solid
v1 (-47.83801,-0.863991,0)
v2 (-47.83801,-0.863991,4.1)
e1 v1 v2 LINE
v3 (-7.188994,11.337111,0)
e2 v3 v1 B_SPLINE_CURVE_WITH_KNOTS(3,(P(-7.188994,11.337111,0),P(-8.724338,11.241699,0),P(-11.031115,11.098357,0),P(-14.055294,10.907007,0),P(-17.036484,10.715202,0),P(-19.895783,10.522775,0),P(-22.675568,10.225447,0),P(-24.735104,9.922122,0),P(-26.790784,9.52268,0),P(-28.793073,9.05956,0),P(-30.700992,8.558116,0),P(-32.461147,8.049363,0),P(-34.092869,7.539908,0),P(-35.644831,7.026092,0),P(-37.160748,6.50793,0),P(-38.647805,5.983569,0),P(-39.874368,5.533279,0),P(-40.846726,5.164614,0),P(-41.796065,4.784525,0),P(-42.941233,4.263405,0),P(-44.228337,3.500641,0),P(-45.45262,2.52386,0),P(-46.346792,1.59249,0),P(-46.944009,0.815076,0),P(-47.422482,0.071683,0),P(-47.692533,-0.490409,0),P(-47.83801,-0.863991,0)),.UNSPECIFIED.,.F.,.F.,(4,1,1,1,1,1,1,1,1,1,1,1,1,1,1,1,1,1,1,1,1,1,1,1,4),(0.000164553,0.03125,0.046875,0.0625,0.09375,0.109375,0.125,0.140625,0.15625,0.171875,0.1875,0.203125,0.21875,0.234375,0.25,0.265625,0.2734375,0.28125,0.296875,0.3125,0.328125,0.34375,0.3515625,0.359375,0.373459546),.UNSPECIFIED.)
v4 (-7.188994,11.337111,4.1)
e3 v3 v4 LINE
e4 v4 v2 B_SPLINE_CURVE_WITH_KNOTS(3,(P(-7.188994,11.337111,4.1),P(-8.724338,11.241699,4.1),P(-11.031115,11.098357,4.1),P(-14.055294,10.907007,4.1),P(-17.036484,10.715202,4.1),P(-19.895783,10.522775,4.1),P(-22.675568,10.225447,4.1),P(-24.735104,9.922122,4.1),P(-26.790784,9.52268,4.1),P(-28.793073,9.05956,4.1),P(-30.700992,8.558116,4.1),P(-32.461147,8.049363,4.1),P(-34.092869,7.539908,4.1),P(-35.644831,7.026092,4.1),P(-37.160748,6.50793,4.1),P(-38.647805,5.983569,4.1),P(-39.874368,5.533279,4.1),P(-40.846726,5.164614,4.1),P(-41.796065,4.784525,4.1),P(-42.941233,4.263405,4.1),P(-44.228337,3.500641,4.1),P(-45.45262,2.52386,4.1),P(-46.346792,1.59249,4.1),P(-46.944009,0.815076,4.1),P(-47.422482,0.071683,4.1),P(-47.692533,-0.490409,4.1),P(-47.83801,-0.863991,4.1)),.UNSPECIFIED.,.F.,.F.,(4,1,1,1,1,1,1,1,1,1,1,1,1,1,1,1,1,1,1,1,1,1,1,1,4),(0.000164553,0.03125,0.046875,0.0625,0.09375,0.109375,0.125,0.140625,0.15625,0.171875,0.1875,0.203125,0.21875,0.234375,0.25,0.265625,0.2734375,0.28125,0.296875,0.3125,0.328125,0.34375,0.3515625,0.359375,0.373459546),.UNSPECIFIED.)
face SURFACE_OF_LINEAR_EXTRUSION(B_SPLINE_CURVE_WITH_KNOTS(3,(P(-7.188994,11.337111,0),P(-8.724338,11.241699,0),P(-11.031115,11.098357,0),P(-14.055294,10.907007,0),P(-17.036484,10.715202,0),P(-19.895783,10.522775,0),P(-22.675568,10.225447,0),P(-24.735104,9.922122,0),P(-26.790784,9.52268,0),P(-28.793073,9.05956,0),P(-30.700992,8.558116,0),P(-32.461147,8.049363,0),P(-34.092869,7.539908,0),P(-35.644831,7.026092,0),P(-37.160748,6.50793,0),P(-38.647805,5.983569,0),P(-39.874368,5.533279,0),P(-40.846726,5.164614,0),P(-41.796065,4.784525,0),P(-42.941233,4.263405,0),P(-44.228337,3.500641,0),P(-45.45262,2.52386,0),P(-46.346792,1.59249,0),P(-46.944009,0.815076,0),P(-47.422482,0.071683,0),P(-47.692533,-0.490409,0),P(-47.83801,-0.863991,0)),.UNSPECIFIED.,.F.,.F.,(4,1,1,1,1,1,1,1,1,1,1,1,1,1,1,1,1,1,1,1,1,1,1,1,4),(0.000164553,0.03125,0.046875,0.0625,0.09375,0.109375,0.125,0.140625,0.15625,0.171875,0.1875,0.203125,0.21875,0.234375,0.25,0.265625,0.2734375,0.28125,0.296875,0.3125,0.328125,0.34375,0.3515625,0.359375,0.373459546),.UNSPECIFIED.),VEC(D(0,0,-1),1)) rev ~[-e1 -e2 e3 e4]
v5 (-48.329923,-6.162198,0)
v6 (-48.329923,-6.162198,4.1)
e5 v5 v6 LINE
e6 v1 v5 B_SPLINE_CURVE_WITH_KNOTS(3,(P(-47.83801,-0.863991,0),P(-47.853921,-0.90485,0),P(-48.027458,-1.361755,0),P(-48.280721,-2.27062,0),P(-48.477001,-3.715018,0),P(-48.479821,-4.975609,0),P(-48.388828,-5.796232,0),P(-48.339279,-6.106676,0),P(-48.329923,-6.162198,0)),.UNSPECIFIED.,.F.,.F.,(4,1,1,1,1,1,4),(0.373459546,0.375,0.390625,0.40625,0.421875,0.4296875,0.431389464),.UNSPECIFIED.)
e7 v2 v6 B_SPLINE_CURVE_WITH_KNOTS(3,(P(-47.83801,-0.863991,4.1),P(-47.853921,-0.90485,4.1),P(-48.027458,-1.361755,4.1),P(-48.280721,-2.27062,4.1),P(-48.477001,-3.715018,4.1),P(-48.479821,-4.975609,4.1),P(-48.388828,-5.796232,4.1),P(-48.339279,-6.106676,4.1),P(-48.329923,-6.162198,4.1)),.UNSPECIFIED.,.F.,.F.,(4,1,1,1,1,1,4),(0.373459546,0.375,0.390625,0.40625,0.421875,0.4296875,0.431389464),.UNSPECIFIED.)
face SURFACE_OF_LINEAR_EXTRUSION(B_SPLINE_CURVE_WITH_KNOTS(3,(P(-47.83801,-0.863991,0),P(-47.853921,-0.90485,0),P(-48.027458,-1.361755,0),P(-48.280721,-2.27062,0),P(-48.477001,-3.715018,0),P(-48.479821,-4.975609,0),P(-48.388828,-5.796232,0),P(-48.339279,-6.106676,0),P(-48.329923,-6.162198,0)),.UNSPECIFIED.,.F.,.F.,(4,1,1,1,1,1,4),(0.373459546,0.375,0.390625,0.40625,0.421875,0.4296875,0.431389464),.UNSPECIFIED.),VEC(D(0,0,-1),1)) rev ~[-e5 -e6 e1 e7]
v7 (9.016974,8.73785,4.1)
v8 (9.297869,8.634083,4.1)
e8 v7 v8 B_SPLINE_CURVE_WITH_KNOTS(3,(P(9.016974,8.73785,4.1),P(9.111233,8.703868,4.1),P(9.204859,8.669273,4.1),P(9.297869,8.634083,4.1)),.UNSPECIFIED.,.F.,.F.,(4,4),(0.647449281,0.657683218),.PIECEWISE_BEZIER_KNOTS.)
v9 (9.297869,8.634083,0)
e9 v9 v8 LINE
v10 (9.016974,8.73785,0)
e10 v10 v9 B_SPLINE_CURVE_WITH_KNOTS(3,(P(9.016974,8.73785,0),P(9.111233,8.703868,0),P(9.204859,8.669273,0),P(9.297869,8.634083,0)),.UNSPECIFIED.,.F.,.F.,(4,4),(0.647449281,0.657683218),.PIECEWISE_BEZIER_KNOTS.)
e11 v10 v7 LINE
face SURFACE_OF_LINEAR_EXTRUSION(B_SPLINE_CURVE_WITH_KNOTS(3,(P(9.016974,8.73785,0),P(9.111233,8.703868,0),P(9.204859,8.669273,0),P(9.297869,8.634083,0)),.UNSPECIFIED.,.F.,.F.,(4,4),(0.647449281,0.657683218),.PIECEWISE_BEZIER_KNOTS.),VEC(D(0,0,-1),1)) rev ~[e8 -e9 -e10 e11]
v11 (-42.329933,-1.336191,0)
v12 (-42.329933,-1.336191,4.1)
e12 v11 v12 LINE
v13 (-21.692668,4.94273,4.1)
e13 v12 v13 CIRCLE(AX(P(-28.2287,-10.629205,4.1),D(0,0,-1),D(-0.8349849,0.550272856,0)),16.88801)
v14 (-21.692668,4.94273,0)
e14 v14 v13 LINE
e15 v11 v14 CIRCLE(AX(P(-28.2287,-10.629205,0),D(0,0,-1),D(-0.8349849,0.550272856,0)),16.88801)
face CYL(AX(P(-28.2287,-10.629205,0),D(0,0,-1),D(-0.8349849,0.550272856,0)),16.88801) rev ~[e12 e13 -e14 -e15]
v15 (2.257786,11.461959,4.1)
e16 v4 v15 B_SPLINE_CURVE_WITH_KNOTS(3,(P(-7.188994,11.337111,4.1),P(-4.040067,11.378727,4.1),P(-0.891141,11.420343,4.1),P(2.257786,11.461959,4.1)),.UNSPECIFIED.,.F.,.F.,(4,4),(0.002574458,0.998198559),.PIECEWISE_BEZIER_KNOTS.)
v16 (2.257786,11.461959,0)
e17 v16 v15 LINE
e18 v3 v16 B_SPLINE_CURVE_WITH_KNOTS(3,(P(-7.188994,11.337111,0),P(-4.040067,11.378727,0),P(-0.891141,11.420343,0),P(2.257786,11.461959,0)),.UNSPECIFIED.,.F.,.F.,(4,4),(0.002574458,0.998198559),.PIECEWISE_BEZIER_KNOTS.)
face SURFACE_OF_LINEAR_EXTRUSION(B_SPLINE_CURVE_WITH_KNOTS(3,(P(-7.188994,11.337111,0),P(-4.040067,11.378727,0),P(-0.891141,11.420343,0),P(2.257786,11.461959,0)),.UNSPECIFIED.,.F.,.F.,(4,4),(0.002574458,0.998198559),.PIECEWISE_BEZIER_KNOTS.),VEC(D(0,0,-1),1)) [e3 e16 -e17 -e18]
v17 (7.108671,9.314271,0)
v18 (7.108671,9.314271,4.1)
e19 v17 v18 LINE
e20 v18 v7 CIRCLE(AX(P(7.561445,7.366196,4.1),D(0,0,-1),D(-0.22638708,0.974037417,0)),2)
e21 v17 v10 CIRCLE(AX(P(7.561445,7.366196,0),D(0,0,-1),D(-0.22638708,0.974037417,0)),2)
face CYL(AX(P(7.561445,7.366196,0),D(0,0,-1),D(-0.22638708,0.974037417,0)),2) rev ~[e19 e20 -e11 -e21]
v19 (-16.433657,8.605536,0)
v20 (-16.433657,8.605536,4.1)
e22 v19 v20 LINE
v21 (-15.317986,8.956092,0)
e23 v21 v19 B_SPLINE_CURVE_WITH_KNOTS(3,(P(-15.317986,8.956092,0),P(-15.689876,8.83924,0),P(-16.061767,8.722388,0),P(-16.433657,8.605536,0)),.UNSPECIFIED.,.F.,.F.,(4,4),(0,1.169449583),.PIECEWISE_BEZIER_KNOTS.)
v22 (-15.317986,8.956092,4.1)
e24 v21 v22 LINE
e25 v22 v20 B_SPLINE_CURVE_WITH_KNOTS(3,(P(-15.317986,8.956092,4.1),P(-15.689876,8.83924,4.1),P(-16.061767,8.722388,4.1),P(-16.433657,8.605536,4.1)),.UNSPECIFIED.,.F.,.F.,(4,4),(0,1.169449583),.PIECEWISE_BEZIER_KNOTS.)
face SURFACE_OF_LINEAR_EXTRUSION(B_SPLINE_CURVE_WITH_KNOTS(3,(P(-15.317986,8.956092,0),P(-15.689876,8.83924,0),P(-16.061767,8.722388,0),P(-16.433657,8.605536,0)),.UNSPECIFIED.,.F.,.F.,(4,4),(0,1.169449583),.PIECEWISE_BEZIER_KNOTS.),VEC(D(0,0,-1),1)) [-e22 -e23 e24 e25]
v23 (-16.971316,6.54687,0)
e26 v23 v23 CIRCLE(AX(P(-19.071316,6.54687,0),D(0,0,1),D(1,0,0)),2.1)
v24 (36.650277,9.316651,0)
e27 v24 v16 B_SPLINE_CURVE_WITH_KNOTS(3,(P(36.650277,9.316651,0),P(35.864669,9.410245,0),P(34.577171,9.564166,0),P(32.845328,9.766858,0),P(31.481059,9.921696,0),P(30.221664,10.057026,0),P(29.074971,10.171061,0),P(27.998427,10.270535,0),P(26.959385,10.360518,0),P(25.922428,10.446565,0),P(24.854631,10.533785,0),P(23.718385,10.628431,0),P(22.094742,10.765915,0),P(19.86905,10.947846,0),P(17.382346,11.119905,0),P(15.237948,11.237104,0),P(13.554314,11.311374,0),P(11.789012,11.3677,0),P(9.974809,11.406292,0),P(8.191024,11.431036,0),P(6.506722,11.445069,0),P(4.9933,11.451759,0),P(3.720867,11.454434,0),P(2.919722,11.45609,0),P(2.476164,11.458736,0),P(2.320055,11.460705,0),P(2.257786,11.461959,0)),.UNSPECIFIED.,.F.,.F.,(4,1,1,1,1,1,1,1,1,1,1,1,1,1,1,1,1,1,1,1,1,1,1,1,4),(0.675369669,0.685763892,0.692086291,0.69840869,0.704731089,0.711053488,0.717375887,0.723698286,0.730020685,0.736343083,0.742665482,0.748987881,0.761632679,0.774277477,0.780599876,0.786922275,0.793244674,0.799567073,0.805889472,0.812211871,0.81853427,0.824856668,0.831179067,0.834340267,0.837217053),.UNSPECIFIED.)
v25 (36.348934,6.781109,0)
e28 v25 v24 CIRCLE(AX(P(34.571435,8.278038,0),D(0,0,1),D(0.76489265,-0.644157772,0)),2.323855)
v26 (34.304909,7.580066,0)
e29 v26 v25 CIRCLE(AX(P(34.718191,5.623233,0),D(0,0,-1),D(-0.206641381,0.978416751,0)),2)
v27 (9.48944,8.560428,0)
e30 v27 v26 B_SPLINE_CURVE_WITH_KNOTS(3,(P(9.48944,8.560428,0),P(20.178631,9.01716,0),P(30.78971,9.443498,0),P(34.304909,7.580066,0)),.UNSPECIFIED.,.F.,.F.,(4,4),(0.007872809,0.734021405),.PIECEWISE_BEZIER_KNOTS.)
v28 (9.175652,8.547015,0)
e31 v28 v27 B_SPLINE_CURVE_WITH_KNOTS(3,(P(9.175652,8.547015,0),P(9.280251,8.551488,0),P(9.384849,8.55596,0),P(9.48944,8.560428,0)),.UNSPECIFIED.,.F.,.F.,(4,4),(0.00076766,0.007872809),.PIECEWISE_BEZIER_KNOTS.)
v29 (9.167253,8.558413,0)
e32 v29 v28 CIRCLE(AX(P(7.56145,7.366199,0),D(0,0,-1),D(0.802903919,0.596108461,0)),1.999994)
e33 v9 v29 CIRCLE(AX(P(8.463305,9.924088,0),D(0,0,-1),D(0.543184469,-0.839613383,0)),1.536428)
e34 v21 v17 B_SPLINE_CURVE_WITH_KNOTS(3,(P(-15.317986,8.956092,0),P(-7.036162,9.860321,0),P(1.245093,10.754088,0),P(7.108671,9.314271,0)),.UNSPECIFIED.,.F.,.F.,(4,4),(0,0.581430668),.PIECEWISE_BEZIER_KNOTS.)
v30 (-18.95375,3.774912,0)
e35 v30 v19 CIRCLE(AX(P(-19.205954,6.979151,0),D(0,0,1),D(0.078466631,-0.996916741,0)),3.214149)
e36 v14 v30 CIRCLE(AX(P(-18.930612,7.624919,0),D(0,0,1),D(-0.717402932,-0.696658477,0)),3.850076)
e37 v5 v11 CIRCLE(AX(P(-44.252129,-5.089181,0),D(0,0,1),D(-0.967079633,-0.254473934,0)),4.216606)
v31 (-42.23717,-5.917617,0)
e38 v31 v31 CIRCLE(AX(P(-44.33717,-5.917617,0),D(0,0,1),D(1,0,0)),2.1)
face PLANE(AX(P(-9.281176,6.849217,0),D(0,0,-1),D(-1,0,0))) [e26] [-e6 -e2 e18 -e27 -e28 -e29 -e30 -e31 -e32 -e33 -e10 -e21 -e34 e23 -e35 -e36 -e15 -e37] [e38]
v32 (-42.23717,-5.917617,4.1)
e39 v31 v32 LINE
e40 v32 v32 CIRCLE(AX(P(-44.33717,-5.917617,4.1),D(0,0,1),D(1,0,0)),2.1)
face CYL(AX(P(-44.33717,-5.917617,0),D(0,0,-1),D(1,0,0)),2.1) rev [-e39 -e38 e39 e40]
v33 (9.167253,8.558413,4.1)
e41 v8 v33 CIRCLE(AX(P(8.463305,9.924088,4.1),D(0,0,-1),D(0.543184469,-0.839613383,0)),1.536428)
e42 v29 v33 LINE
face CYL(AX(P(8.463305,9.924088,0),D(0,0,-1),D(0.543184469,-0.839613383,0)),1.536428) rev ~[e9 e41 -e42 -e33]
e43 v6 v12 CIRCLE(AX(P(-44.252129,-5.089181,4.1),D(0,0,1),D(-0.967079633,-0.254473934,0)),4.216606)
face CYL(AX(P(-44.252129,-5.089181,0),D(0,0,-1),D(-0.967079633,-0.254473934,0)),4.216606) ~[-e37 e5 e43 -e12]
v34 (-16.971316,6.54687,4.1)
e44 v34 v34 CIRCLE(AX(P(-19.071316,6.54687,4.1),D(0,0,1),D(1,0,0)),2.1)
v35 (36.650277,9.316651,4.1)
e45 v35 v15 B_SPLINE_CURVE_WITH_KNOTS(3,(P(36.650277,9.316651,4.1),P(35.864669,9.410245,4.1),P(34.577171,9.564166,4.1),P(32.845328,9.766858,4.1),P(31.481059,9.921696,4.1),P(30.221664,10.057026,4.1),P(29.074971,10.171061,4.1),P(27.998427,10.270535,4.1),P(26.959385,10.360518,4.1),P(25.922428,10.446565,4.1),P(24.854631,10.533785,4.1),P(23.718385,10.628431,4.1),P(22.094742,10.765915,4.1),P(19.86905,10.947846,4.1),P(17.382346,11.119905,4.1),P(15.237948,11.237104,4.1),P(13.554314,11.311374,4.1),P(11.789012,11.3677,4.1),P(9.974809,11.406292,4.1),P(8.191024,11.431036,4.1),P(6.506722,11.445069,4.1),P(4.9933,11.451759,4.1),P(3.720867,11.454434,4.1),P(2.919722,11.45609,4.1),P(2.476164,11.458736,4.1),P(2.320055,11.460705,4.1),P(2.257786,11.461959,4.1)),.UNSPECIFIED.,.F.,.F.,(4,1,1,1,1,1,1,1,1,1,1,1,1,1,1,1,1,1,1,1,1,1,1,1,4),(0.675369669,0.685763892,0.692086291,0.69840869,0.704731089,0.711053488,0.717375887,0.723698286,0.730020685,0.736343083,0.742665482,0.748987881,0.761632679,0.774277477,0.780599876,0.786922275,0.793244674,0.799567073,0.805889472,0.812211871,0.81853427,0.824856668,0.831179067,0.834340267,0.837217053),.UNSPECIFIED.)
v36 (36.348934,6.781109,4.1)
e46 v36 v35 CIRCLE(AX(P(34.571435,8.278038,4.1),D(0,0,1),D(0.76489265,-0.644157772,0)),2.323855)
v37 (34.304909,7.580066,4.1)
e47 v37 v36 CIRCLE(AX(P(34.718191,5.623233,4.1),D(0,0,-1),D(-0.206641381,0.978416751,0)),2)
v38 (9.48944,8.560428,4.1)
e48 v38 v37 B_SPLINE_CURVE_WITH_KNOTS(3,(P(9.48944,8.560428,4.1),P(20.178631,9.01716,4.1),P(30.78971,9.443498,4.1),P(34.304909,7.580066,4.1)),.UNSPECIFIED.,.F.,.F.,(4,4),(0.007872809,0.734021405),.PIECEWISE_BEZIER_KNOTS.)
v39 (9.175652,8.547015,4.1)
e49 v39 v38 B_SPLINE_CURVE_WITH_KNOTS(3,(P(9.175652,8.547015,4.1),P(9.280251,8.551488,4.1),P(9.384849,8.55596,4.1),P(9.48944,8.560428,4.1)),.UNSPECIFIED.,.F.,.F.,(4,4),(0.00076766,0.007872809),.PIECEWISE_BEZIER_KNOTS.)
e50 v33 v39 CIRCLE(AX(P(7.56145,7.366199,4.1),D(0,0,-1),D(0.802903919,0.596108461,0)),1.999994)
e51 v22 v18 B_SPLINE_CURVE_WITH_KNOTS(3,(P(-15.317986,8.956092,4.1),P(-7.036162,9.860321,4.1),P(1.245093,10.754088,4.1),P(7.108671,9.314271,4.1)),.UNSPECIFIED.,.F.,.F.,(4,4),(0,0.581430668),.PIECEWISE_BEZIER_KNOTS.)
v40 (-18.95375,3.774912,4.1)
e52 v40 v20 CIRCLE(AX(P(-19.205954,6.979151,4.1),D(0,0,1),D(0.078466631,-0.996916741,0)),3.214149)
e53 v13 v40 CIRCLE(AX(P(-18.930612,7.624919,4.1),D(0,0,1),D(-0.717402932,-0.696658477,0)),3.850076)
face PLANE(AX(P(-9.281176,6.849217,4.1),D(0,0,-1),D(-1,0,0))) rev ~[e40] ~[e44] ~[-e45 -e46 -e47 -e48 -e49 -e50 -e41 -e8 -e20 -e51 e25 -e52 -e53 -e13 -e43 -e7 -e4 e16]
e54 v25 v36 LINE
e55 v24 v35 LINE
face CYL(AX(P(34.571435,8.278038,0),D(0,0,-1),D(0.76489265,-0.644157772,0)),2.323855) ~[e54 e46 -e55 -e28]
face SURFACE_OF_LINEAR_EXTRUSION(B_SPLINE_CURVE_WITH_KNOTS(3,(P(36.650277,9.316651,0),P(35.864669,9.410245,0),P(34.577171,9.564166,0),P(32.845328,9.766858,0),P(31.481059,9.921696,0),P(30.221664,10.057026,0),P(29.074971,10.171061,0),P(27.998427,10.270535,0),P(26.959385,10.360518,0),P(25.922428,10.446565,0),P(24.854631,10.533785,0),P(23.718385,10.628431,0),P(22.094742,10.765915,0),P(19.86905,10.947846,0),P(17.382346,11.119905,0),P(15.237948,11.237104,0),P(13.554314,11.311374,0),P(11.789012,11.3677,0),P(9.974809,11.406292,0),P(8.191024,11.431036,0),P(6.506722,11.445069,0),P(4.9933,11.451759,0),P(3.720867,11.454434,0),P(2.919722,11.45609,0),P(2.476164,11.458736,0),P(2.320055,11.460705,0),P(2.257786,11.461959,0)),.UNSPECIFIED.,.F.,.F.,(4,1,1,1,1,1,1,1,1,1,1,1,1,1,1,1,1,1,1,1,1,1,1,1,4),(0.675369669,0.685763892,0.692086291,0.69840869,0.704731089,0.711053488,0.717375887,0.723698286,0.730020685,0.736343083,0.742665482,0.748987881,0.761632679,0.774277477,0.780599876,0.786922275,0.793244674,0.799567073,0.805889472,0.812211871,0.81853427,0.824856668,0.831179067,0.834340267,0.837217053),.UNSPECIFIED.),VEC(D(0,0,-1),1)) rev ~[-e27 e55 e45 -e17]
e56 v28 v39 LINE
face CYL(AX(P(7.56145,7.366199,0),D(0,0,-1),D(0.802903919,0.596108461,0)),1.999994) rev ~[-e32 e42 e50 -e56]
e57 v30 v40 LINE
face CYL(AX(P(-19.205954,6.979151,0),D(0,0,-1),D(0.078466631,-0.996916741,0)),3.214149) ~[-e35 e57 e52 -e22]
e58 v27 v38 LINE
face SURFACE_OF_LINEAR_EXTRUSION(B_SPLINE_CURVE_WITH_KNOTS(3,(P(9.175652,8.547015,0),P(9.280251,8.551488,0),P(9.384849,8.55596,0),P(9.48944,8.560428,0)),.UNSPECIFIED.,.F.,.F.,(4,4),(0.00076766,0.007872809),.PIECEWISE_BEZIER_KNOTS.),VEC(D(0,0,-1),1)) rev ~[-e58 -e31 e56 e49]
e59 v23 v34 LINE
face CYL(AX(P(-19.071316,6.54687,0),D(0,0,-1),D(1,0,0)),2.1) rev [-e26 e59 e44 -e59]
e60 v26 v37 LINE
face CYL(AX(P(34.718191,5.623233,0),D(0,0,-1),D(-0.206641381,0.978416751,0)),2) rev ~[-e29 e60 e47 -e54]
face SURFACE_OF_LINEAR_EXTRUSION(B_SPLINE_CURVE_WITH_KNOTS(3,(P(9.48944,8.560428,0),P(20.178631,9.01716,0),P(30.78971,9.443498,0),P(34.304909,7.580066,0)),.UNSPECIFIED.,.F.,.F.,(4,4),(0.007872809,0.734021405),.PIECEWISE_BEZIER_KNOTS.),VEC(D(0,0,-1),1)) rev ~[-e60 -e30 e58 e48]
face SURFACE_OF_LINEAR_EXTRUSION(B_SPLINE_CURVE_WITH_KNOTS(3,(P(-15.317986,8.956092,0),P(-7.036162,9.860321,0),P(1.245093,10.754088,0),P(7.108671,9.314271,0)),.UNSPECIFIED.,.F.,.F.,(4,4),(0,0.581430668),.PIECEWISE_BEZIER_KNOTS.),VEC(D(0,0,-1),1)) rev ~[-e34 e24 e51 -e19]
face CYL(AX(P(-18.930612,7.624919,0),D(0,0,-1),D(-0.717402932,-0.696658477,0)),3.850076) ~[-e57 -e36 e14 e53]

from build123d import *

# Parameters (mm, degrees)
F0_R     = 2.1
F1_DEPTH = 4.1


# Not quite as in the source:
# - the dataset's text gives a spline's control points without its knots; the knots are read off the source's solid


with BuildPart() as f1:
    # F0 (on Top) → F1 (new body)
    with BuildSketch(Plane.XY):
        with BuildLine():
            add(Edge.make_bspline(
                [(-7.1889940943, 11.3371111296), (-4.0400674757, 11.378726928), (-0.8911408571, 11.4203427264), (2.2577857615, 11.4619585248)],
                knots=[0.0025744578, 0.0025744578, 0.0025744578, 0.0025744578, 0.9981985586, 0.9981985586, 0.9981985586, 0.9981985586], degree=3))
            add(Edge.make_bspline(
                [(-7.1889940943, 11.3371111296), (-8.7243380234, 11.2416990231), (-11.0311154467, 11.0983567929), (-14.0552941607, 10.9070068206), (-17.0364840295, 10.7152017294), (-19.8957827411, 10.5227751645), (-22.6755680541, 10.2254472092), (-24.7351040641, 9.9221224701), (-26.7907840734, 9.5226800469), (-28.7930725745, 9.0595604731), (-30.7009918926, 8.5581161043), (-32.4611472882, 8.0493632371), (-34.0928691245, 7.5399082887), (-35.6448312044, 7.0260920816), (-37.1607478855, 6.5079303839), (-38.6478053455, 5.9835690127), (-39.8743681253, 5.5332793467), (-40.8467259962, 5.1646139076), (-41.7960653414, 4.7845249787), (-42.9412331822, 4.2634047579), (-44.2283369213, 3.5006412719), (-45.4526195393, 2.5238601501), (-46.3467921373, 1.5924900737), (-46.9440085195, 0.8150763514), (-47.4224819266, 0.0716833781), (-47.6925333314, -0.4904090932), (-47.8380102388, -0.8639908212)],
                knots=[0.0001645527, 0.0001645527, 0.0001645527, 0.0001645527, 0.03125, 0.046875, 0.0625, 0.09375, 0.109375, 0.125, 0.140625, 0.15625, 0.171875, 0.1875, 0.203125, 0.21875, 0.234375, 0.25, 0.265625, 0.2734375, 0.28125, 0.296875, 0.3125, 0.328125, 0.34375, 0.3515625, 0.359375, 0.373459546, 0.373459546, 0.373459546, 0.373459546], degree=3))
            add(Edge.make_bspline(
                [(-47.8380102388, -0.8639908212), (-47.8539213294, -0.9048501769), (-48.0274581717, -1.3617547655), (-48.2807207722, -2.2706204398), (-48.4770009887, -3.7150176775), (-48.4798207479, -4.9756086404), (-48.3888275454, -5.7962324568), (-48.3392794649, -6.1066755823), (-48.3299230612, -6.1621975504)],
                knots=[0.373459546, 0.373459546, 0.373459546, 0.373459546, 0.375, 0.390625, 0.40625, 0.421875, 0.4296875, 0.4313894643, 0.4313894643, 0.4313894643, 0.4313894643], degree=3))
            ThreePointArc((-48.3299230612, -6.1621975504), (-41.6093586104, -8.374837019), (-42.3299329619, -1.3361913709))
            ThreePointArc((-42.3299329619, -1.3361913709), (-33.1444175869, 5.5275459689), (-21.6926677793, 4.9427303382))
            ThreePointArc((-21.6926677793, 4.9427303382), (-20.4406705014, 4.0833356397), (-18.9537504594, 3.7749118723))
            ThreePointArc((-18.9537504594, 3.7749118723), (-16.3562817519, 5.4925025893), (-16.4336573959, 8.6055356067))
            add(Edge.make_bspline(
                [(-15.3179860369, 8.9560919431), (-15.6898764899, 8.839239831), (-16.0617669429, 8.7223877188), (-16.4336573959, 8.6055356067)],
                knots=[0, 0, 0, 0, 1.1694495826, 1.1694495826, 1.1694495826, 1.1694495826], degree=3))
            add(Edge.make_bspline(
                [(-15.3179860369, 8.9560919431), (-7.0361622279, 9.8603205112), (1.2450933884, 10.7540884183), (7.1086706108, 9.3142706211)],
                knots=[0, 0, 0, 0, 0.5814306684, 0.5814306684, 0.5814306684, 0.5814306684], degree=3))
            ThreePointArc((7.1086706108, 9.3142706211), (8.1397564178, 9.2807598726), (9.0169736045, 8.7378501942))
            add(Edge.make_bspline(
                [(9.0169736045, 8.7378501942), (9.1112334208, 8.7038678093), (9.2048591167, 8.6692727004), (9.2978690964, 8.6340825262)],
                knots=[0.6474492811, 0.6474492811, 0.6474492811, 0.6474492811, 0.6576832175, 0.6576832175, 0.6576832175, 0.6576832175], degree=3))
            add(Edge.make_bspline(
                [(9.2978690964, 8.6340825262), (9.3620169205, 8.6098123015), (9.4258718675, 8.5852590228), (9.4894399752, 8.5604284832)],
                knots=[0.6576832175, 0.6576832175, 0.6576832175, 0.6576832175, 0.664741436, 0.664741436, 0.664741436, 0.664741436], degree=3))
            add(Edge.make_bspline(
                [(9.4894399752, 8.5604284832), (20.1786312058, 9.0171598272), (30.7897103436, 9.4434976677), (34.3049085784, 7.5800661268)],
                knots=[0.0078728095, 0.0078728095, 0.0078728095, 0.0078728095, 0.7340214047, 0.7340214047, 0.7340214047, 0.7340214047], degree=3))
            ThreePointArc((34.3049085784, 7.5800661268), (35.4462954706, 7.4859898214), (36.3489343996, 6.7811087302))
            ThreePointArc((36.3489343996, 6.7811087302), (36.8790497693, 8.0037841101), (36.6502768797, 9.3166513367))
            add(Edge.make_bspline(
                [(36.6502768797, 9.3166513367), (35.8646692204, 9.4102452527), (34.5771705441, 9.5641656546), (32.8453284038, 9.766858119), (31.4810593515, 9.9216959685), (30.2216638222, 10.0570259134), (29.0749710159, 10.1710606279), (27.998427122, 10.2705354697), (26.9593851329, 10.3605177789), (25.9224275902, 10.4465645091), (24.8546312229, 10.5337851633), (23.7183846338, 10.6284306145), (22.0947419096, 10.7659145801), (19.8690501247, 10.947846215), (17.3823459067, 11.1199052699), (15.2379483396, 11.23710443), (13.5543144395, 11.3113741003), (11.7890118212, 11.36769996), (9.9748087559, 11.4062922205), (8.1910240467, 11.4310364541), (6.5067223519, 11.4450690607), (4.9932998476, 11.4517588504), (3.72086677, 11.4544341193), (2.9197217826, 11.456089603), (2.4761636021, 11.4587356227), (2.3200545408, 11.4607049569), (2.2577857615, 11.4619585248)],
                knots=[0.6753696694, 0.6753696694, 0.6753696694, 0.6753696694, 0.6857638921, 0.692086291, 0.6984086899, 0.7047310889, 0.7110534878, 0.7173758867, 0.7236982857, 0.7300206846, 0.7363430835, 0.7426654824, 0.7489878814, 0.7616326792, 0.7742774771, 0.780599876, 0.7869222749, 0.7932446739, 0.7995670728, 0.8058894717, 0.8122118707, 0.8185342696, 0.8248566685, 0.8311790674, 0.8343402669, 0.8372170533, 0.8372170533, 0.8372170533, 0.8372170533], degree=3))
        make_face()
        with Locations((-44.3371695162, -5.9176166552)):
            Circle(F0_R, mode=Mode.SUBTRACT)
        with Locations((-19.0713156642, 6.5468703386)):
            Circle(F0_R, mode=Mode.SUBTRACT)
        with BuildLine():
            add(Edge.make_bspline(
                [(9.1756523659, 8.5470149257), (9.2802513314, 8.5514876104), (9.3848493925, 8.5559595017), (9.4894399752, 8.5604284832)],
                knots=[0.0007676597, 0.0007676597, 0.0007676597, 0.0007676597, 0.0078728095, 0.0078728095, 0.0078728095, 0.0078728095], degree=3))
            add(Edge.make_bspline(
                [(9.2978690964, 8.6340825262), (9.3620169205, 8.6098123015), (9.4258718675, 8.5852590228), (9.4894399752, 8.5604284832)],
                knots=[0.6576832175, 0.6576832175, 0.6576832175, 0.6576832175, 0.664741436, 0.664741436, 0.664741436, 0.664741436], degree=3))
            ThreePointArc((9.2978690964, 8.6340825262), (9.2334907266, 8.5946425284), (9.1672526158, 8.5584126983))
            ThreePointArc((9.1672526158, 8.5584126983), (9.1714625769, 8.5527212451), (9.1756523659, 8.5470149257))
        make_face()
    extrude(amount=F1_DEPTH)


solid = f1.part
